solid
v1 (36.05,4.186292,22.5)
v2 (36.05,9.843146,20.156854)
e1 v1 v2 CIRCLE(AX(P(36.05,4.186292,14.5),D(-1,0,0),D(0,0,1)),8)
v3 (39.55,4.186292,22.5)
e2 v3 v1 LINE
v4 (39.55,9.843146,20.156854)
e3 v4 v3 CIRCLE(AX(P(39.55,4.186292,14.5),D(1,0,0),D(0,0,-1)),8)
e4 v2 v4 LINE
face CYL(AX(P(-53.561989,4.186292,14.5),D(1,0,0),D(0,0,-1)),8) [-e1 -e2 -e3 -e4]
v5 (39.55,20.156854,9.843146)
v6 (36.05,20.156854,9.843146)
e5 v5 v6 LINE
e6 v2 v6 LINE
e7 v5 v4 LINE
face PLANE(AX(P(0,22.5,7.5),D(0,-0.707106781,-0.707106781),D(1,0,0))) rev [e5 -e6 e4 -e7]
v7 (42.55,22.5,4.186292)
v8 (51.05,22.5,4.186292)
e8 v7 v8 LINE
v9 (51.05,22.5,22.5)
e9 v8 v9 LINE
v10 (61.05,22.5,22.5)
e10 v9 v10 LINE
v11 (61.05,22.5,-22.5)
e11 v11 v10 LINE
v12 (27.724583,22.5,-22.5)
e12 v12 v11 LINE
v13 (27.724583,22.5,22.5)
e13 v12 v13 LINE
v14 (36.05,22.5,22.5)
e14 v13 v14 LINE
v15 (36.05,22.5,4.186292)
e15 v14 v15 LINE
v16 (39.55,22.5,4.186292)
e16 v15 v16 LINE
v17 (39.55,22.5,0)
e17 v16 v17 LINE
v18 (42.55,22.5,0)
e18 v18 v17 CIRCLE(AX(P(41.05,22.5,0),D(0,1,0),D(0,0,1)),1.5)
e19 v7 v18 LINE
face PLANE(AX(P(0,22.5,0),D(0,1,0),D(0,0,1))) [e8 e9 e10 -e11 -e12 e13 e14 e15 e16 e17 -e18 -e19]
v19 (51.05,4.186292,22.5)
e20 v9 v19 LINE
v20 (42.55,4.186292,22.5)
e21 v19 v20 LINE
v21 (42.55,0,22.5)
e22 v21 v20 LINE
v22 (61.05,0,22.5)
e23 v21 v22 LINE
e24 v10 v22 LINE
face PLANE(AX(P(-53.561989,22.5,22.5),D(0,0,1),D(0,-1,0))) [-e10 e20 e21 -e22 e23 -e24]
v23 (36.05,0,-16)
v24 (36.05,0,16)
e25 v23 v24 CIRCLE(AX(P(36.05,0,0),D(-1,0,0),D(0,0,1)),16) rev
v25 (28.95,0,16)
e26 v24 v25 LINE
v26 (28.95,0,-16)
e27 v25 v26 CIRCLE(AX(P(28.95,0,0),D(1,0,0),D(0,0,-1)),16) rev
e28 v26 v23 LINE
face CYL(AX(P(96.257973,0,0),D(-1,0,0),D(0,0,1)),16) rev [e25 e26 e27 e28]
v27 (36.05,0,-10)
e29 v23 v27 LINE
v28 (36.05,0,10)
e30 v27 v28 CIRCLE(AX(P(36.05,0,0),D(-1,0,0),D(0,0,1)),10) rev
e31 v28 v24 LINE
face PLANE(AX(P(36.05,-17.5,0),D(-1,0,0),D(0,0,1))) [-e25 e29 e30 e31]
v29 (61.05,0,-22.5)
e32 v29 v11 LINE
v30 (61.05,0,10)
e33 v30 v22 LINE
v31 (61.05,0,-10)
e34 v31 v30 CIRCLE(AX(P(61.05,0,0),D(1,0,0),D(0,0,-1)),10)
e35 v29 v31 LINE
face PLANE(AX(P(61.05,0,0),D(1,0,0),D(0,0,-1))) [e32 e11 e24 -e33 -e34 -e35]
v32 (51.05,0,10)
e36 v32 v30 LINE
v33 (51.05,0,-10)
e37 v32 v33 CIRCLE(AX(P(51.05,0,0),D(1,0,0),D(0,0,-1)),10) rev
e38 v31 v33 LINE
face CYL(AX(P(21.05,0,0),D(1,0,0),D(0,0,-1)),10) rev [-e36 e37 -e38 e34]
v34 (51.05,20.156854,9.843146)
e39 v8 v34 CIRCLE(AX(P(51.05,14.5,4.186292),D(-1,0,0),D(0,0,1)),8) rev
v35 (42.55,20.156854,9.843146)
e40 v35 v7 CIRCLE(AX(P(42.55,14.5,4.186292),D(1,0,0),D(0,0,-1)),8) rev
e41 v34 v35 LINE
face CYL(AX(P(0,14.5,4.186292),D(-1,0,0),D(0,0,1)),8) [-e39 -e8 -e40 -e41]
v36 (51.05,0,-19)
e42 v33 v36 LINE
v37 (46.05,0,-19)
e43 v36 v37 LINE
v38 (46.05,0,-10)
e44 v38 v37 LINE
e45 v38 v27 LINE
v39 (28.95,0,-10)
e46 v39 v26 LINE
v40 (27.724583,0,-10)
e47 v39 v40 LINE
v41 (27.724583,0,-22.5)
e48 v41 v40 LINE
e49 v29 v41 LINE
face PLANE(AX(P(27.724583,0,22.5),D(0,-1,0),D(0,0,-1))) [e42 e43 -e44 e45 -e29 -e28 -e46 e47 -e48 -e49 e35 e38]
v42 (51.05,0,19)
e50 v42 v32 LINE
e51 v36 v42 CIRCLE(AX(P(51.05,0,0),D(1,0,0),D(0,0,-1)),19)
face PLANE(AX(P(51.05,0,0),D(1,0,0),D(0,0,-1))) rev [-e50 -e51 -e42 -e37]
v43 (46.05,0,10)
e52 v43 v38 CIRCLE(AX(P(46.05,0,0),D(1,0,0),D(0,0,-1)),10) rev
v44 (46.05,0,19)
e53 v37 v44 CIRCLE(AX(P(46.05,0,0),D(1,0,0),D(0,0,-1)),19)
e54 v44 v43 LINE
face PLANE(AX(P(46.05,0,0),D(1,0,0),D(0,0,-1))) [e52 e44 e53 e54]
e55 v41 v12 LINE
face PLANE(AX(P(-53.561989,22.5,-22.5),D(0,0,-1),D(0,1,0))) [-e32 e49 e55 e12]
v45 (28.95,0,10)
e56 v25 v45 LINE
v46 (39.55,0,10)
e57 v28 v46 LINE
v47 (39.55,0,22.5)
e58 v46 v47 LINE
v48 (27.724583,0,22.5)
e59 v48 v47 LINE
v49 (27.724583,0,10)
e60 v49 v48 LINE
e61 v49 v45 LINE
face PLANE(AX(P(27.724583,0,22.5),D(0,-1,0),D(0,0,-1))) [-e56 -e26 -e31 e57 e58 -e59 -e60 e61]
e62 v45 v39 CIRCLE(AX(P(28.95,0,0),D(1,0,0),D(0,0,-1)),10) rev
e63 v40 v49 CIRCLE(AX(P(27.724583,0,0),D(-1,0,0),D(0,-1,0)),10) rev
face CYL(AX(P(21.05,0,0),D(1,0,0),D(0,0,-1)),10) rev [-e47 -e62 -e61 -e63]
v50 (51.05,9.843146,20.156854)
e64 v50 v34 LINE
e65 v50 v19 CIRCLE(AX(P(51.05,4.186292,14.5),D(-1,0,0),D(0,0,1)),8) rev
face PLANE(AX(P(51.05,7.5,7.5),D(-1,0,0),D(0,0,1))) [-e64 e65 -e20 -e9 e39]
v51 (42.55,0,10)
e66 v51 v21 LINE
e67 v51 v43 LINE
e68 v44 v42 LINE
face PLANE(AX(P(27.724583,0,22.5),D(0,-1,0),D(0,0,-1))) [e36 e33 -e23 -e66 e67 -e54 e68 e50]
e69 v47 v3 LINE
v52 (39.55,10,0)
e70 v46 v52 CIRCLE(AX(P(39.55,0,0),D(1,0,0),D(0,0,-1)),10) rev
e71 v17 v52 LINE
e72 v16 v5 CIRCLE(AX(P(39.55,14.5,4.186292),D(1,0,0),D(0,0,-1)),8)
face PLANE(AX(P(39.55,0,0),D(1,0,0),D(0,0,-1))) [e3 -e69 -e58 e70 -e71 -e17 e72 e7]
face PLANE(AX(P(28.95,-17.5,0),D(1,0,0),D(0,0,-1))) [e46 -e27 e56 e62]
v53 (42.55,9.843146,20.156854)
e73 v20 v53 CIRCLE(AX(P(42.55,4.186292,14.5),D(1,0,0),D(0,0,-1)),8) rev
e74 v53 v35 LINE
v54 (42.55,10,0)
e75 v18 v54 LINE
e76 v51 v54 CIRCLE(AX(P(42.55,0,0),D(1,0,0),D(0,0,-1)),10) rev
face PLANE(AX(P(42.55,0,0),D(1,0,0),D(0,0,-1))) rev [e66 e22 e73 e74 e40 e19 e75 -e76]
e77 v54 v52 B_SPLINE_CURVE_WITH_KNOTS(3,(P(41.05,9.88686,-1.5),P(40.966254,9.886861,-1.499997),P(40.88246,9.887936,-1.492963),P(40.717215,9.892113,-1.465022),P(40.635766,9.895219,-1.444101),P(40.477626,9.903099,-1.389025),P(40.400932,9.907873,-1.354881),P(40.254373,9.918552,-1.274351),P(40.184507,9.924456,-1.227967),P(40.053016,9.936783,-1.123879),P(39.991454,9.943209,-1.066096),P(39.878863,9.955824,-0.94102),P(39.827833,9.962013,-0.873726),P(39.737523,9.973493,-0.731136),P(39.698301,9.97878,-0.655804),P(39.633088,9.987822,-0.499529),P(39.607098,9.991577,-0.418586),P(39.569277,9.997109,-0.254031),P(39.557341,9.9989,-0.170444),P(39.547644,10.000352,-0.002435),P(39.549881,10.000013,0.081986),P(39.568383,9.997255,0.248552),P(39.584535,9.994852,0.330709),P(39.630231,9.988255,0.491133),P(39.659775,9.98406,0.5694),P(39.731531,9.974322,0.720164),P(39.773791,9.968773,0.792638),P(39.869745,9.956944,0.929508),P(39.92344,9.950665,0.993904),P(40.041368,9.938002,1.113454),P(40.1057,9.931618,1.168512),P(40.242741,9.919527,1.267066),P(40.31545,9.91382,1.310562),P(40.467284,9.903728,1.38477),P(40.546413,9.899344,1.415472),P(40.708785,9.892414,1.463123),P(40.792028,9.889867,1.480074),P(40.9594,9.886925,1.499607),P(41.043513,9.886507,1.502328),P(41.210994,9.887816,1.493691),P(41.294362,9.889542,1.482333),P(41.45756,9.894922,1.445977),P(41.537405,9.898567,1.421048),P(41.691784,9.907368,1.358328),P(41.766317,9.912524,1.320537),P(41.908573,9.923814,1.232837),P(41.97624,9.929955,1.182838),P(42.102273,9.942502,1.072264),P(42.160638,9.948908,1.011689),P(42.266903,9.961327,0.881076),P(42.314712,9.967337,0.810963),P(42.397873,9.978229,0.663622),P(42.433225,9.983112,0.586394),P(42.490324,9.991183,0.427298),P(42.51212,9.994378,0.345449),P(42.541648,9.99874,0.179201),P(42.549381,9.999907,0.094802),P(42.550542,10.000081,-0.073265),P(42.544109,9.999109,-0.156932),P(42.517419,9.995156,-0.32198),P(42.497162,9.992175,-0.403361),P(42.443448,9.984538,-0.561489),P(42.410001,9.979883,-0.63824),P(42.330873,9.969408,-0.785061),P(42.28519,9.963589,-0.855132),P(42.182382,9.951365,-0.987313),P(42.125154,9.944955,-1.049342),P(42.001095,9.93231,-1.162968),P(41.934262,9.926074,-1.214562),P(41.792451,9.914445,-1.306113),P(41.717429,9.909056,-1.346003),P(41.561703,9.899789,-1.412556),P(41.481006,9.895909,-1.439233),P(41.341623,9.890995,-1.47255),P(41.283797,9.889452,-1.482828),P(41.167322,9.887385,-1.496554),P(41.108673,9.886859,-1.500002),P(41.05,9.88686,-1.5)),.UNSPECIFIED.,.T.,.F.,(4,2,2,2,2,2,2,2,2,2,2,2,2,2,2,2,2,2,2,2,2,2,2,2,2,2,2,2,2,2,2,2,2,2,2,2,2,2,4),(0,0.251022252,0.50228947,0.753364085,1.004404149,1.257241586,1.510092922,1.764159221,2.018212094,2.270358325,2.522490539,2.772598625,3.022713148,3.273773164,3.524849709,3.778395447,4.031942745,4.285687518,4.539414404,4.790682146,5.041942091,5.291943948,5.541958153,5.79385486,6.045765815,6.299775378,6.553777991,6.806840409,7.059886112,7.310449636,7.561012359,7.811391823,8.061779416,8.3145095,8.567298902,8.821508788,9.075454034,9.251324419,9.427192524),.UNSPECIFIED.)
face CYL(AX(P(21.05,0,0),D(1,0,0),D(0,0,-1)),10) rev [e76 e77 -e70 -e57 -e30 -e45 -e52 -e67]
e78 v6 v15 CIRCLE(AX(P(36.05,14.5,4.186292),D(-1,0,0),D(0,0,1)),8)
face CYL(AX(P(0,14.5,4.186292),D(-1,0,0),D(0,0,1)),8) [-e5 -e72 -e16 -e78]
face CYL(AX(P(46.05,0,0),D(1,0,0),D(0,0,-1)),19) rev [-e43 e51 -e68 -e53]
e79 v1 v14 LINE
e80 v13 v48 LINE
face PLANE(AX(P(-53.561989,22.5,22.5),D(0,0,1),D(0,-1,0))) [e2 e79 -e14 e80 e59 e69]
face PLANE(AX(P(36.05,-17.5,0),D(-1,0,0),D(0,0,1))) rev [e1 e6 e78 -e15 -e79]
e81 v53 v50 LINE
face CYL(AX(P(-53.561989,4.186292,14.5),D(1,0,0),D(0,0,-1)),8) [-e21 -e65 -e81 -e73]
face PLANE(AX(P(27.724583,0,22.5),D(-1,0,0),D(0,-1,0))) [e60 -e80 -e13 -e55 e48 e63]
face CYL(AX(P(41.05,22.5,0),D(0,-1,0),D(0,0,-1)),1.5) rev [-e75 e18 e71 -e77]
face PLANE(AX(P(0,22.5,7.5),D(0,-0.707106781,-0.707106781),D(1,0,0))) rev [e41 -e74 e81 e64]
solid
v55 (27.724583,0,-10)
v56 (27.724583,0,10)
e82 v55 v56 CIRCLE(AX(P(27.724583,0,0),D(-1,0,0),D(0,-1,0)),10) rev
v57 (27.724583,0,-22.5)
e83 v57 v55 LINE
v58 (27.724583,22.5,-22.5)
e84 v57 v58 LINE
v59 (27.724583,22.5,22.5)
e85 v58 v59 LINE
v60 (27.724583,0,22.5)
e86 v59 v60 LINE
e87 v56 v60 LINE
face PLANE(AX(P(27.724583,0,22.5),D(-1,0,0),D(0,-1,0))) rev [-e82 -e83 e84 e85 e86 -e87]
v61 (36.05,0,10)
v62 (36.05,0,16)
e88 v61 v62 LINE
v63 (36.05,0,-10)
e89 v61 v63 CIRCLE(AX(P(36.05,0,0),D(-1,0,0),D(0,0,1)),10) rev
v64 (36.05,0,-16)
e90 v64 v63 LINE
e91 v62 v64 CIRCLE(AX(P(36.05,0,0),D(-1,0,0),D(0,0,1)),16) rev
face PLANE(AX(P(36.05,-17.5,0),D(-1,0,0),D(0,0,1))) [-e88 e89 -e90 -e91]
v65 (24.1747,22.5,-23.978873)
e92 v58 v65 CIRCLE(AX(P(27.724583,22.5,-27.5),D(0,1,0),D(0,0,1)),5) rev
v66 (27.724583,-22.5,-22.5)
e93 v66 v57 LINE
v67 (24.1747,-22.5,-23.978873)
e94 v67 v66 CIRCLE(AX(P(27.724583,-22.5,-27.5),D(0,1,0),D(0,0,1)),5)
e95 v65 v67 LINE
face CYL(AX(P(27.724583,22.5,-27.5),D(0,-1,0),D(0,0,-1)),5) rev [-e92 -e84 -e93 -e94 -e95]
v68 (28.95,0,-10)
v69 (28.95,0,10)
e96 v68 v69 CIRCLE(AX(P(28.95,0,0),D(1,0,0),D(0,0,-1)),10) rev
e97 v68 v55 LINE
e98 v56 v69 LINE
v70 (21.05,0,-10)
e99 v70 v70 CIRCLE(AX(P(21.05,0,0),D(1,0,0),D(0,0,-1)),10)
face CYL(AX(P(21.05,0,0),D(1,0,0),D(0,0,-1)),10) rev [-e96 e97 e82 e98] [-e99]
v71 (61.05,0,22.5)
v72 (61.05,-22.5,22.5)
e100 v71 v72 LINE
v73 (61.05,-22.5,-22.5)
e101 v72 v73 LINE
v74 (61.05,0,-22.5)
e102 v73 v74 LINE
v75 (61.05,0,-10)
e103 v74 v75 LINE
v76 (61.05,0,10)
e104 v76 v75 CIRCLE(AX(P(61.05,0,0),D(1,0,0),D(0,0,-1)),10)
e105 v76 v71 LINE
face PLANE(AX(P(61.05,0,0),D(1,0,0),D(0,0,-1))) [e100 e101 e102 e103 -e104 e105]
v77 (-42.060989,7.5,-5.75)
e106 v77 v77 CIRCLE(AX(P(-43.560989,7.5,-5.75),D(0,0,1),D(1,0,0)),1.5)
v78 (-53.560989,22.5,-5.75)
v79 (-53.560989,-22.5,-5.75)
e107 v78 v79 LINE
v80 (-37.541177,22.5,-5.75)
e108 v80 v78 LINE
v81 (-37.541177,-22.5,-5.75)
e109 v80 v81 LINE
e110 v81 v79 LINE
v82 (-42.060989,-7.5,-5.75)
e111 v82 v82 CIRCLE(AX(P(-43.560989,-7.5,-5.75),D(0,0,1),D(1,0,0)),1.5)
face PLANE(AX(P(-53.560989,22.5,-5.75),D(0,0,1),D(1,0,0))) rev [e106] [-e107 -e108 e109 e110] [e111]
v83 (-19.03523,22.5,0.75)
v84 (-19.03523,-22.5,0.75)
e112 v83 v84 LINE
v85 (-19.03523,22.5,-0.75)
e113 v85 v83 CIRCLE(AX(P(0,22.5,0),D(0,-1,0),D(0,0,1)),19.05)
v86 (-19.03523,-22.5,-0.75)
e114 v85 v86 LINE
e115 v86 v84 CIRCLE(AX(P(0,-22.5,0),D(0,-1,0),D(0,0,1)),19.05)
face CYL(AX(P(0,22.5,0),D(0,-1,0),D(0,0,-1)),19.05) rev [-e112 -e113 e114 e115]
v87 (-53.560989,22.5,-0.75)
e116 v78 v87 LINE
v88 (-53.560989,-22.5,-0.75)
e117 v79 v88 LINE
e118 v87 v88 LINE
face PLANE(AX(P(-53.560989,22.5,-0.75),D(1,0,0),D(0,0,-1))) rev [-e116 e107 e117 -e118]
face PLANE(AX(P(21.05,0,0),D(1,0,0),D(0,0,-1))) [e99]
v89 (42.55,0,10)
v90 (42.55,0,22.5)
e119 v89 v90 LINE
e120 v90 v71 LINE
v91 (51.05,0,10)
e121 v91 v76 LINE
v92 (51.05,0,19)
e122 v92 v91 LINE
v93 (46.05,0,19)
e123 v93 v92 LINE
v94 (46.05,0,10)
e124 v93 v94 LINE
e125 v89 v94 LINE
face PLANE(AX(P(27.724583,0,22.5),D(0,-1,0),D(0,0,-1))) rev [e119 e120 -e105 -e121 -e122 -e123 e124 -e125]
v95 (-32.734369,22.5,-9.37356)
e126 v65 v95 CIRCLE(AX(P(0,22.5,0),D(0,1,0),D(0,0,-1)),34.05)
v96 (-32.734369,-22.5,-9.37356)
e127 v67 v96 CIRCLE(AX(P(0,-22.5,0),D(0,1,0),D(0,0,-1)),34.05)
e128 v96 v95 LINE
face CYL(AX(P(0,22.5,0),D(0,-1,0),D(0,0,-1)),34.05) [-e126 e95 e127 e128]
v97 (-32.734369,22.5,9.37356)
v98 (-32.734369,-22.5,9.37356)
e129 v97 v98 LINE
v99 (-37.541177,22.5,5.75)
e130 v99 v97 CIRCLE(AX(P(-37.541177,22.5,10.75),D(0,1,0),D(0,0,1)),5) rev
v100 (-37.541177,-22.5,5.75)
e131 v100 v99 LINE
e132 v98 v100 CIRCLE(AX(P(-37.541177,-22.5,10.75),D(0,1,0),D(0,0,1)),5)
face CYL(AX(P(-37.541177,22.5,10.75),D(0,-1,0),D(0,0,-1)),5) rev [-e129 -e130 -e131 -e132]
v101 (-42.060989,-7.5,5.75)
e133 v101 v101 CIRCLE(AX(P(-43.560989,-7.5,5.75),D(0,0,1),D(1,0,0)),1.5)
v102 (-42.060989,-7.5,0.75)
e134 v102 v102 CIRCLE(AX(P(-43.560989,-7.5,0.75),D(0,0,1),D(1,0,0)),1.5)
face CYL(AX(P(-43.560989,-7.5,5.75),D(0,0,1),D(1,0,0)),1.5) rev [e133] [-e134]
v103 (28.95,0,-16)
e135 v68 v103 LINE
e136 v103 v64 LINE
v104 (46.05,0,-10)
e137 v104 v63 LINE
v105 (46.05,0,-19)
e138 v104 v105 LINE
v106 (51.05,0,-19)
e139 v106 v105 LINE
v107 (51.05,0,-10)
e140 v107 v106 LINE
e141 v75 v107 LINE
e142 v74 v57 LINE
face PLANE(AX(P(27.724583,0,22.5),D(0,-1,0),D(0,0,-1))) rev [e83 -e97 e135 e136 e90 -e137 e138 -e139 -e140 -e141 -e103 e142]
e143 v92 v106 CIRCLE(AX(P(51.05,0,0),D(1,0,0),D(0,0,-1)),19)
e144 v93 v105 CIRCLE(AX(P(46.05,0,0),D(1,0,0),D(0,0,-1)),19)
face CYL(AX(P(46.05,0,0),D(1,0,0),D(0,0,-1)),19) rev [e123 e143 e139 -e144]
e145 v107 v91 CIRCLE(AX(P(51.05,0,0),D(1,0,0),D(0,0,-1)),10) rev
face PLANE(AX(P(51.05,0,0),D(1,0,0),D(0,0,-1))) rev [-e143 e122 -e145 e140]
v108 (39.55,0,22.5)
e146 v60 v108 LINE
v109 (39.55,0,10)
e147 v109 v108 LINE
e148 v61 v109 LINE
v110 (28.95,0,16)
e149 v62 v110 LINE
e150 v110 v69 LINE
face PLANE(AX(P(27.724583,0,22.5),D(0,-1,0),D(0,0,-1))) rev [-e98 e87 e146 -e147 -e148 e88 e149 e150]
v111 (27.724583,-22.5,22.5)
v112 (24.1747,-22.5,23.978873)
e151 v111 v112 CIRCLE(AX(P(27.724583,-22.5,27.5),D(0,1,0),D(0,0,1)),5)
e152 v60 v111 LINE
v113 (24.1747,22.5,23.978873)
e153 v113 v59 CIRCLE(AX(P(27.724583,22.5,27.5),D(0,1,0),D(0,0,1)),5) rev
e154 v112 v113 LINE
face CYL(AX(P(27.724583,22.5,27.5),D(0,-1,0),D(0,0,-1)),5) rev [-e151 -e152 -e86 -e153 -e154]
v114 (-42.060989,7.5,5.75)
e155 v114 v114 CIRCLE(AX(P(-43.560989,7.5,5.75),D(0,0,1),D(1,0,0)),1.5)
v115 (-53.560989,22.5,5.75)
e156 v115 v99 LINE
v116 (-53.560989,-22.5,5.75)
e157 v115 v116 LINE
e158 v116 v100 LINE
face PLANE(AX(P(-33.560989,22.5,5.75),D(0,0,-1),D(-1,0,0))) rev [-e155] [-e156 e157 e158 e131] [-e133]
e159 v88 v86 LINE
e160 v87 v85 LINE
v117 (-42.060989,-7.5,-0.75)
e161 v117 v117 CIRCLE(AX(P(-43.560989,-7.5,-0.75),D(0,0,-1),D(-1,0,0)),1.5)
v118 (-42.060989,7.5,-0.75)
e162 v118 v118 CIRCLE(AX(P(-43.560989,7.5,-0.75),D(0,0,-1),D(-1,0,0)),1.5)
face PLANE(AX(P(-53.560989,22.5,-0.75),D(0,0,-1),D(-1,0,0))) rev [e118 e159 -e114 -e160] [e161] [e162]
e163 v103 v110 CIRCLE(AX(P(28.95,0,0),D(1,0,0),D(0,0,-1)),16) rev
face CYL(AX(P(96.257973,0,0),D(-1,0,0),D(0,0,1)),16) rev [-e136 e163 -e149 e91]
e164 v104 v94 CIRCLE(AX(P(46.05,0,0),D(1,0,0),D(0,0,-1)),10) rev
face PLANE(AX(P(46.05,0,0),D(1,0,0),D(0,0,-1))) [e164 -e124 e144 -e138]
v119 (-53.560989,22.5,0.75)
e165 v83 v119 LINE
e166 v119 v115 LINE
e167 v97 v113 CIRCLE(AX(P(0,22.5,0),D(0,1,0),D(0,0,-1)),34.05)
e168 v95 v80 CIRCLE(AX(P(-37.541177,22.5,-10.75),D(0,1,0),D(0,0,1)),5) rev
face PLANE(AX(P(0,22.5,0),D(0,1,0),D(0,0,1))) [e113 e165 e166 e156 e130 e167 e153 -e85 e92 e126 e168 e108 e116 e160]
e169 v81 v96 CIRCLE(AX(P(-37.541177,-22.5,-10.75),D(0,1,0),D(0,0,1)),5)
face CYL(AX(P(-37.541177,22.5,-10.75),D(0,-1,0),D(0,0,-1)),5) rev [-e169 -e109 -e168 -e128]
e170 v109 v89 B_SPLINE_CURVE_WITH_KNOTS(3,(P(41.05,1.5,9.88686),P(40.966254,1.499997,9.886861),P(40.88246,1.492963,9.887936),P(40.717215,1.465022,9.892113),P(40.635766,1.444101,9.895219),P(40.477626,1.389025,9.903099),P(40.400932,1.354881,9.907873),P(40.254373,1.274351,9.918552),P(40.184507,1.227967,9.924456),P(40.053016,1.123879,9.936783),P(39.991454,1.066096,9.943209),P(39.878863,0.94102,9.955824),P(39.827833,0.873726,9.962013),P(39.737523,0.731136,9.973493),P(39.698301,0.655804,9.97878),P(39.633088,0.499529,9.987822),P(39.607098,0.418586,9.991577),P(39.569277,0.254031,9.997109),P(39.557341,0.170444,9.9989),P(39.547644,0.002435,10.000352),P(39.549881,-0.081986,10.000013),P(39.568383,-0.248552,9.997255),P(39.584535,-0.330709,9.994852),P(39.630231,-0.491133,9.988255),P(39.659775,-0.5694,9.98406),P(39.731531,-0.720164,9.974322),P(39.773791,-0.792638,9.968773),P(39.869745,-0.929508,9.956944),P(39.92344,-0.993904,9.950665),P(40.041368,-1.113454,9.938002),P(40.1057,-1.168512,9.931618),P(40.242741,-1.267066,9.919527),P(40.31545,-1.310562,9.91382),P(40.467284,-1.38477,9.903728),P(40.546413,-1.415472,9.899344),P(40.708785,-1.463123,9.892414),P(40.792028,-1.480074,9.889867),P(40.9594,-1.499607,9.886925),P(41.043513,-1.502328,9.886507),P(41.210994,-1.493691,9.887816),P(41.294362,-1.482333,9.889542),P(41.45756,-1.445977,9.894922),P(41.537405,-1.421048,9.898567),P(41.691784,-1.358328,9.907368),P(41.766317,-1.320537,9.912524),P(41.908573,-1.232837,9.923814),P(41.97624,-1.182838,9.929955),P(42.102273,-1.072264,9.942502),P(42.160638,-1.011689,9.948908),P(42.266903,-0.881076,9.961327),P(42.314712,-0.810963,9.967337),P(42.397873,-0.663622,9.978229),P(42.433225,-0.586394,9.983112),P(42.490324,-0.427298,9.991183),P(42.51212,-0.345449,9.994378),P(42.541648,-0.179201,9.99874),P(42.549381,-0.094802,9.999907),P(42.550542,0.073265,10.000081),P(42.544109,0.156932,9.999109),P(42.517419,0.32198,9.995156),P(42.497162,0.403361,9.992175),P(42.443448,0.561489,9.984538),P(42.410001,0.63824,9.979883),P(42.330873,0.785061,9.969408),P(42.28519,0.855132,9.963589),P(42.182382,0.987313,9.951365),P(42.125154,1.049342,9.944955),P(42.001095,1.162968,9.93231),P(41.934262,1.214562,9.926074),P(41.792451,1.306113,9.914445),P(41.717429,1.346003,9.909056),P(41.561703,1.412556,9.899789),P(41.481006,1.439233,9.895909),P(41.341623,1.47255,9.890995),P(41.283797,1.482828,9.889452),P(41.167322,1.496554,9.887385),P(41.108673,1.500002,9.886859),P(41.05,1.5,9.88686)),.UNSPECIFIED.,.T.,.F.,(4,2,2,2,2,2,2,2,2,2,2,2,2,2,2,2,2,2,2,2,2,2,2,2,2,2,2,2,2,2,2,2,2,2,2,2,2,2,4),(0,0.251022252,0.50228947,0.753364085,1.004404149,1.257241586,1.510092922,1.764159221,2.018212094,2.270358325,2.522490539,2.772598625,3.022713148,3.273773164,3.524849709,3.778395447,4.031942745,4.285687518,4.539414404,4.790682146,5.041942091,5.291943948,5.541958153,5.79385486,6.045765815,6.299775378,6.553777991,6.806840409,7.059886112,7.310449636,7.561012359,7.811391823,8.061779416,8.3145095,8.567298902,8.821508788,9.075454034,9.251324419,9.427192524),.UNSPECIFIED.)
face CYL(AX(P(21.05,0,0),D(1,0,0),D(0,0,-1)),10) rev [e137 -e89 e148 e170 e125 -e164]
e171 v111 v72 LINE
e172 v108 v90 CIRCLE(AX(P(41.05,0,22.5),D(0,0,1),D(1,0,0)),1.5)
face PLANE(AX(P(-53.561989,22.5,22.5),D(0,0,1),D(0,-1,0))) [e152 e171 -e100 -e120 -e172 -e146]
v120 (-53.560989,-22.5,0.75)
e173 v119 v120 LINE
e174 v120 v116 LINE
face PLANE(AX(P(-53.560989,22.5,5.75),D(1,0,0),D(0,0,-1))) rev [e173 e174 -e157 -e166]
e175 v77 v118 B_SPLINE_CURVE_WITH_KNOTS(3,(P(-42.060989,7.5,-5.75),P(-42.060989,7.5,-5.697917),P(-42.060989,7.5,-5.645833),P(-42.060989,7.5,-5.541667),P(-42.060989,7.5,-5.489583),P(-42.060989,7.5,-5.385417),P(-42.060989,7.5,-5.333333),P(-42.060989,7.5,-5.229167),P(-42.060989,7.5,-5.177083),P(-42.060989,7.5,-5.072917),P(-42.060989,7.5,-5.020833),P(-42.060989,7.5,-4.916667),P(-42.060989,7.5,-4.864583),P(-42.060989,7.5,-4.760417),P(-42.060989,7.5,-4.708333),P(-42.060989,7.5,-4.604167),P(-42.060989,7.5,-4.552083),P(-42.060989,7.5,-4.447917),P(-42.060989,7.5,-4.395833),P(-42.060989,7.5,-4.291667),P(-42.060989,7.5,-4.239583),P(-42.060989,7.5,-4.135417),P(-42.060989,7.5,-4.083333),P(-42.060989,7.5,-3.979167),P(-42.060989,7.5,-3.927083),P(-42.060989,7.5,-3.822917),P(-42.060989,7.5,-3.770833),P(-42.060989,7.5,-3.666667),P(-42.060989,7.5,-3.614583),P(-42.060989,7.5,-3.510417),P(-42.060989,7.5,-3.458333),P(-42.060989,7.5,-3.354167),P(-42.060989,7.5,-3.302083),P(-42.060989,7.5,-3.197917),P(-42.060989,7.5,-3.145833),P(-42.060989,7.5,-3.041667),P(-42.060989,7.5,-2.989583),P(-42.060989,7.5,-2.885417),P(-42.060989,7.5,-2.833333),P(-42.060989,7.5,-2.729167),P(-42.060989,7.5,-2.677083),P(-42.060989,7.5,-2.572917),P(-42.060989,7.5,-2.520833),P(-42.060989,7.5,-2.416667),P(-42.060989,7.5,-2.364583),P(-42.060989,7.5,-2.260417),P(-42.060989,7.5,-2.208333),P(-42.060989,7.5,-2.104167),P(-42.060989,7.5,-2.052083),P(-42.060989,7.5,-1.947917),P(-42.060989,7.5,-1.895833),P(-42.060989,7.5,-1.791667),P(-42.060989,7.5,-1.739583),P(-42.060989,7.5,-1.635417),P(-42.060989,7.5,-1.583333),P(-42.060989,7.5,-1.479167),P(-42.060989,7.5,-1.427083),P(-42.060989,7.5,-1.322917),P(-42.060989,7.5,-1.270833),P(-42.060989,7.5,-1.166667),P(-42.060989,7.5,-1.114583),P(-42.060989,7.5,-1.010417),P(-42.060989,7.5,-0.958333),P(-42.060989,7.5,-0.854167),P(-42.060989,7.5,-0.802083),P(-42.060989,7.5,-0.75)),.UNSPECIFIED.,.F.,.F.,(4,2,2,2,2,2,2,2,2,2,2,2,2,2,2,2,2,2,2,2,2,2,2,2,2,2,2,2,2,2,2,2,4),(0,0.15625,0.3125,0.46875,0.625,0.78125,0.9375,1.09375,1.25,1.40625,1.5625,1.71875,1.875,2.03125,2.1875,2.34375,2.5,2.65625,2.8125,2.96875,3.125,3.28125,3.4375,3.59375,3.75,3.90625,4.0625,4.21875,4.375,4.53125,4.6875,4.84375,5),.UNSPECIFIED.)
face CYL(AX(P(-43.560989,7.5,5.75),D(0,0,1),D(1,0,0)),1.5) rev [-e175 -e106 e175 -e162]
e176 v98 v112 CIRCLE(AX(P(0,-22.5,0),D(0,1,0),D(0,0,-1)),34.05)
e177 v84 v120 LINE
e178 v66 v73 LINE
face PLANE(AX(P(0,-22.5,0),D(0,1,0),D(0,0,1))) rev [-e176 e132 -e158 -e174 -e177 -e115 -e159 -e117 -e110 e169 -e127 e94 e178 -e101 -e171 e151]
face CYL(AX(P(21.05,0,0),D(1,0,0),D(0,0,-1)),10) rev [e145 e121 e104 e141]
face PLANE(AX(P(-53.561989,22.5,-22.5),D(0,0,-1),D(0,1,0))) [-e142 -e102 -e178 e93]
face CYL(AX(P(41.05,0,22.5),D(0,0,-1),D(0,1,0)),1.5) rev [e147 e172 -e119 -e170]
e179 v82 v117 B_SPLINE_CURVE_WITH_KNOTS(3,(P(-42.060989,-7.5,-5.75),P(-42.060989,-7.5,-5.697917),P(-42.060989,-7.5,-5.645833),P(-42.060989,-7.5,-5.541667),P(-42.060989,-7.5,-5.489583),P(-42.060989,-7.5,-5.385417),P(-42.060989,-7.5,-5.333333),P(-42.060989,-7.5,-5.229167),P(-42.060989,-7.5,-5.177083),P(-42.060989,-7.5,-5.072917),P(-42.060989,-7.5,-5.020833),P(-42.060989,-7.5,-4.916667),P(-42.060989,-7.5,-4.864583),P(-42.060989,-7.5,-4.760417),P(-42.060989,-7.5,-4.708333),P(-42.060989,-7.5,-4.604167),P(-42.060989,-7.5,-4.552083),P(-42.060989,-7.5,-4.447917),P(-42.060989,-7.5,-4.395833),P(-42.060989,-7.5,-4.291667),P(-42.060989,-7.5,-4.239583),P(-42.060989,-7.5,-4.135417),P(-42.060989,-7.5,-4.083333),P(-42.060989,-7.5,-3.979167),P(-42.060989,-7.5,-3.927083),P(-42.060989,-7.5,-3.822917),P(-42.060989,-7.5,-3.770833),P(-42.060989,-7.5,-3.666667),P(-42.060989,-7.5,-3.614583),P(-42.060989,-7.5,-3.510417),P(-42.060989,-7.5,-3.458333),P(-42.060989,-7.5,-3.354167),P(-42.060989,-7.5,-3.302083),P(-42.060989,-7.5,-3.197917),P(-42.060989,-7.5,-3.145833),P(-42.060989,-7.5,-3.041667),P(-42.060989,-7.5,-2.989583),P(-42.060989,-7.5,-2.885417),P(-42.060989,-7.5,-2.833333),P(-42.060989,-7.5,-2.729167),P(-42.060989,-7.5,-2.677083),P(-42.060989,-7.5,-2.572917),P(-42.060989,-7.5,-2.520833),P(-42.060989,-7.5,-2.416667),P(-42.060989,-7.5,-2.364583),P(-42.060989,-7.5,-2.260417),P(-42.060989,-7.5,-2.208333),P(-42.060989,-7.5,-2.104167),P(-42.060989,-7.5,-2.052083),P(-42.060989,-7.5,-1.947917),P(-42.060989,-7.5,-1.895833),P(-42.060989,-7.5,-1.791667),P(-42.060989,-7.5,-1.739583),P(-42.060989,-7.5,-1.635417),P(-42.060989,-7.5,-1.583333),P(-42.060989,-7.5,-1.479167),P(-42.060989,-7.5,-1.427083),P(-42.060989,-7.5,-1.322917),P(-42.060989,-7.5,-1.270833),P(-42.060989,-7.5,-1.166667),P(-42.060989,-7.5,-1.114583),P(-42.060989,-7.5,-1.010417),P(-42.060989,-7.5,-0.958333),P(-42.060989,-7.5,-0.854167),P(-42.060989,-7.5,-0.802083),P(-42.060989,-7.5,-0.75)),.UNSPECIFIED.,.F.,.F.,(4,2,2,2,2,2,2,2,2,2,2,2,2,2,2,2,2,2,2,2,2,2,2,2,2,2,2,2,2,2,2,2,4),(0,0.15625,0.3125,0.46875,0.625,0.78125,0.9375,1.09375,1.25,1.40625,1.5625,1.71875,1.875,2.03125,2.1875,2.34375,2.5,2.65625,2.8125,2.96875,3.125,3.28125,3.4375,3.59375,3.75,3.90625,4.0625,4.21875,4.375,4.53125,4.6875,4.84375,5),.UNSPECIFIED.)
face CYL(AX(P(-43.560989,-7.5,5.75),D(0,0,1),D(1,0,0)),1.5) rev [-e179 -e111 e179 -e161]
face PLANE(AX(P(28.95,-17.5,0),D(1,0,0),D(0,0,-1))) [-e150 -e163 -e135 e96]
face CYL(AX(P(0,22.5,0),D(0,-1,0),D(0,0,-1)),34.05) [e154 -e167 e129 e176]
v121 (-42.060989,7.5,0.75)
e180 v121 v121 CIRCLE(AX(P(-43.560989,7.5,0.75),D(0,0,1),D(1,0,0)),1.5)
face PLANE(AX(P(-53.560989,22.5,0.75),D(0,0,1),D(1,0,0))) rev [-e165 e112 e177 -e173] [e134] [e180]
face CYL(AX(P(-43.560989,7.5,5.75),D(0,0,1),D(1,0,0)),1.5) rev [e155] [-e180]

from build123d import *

# Parameters (mm, degrees)
BOSS_EXTRUDE1_DEPTH     = 22.5
F_3_0MM_DOWEL_HOLE1_D   = 3
BOSS_EXTRUDE2_START     = -8.493151603
BOSS_EXTRUDE2_OUTLINE_W = 45
BOSS_EXTRUDE2_OUTLINE_H = 45
BOSS_EXTRUDE2_DEPTH     = 35.493151603
SKETCH5_R               = 10
CUT_EXTRUDE1_DEPTH      = 40
CUT_EXTRUDE9_START      = -10
SKETCH16_R              = 19
CUT_EXTRUDE9_DEPTH      = 5
CUT_EXTRUDE2_START      = 22.5
SKETCH7_W               = 7.1
SKETCH7_H               = 45
CUT_EXTRUDE2_DEPTH      = 40
SKETCH8_W               = 22.5
SKETCH8_H               = 22.5
CUT_EXTRUDE3_DEPTH      = 1.5
CUT_EXTRUDE5_OUTLINE_W  = 1.5
CUT_EXTRUDE5_OUTLINE_H  = 12.613186919
CUT_EXTRUDE8_START      = 9
CUT_EXTRUDE8_DEPTH      = 14
CHAMFER1_START          = 36.05
CHAMFER1_DEPTH          = 15
FILLET3_R               = 5
FILLET4_R               = 8
SKETCH23_W              = 45
SKETCH23_H              = 40
SKETCH23_R              = 16
BOSS_EXTRUDE5_DEPTH     = 7.1
SPLIT1_START            = 27.724582954
SPLIT1_DEPTH            = 33.325417046
SPLIT1_START_2          = 51.05
SPLIT1_2_DEPTH          = 10
SPLIT1_START_3          = 36.05
SPLIT1_3_DEPTH          = 10
SPLIT1_4_DEPTH          = 8.325417046
SPLIT1_5_DEPTH          = 1.225417046
SPLIT1_START_4          = -1
SPLIT1_6_DEPTH          = 24
SPLIT1_7_DEPTH          = 22.5


with BuildPart() as part:
    # Sketch3 → Boss-Extrude1 (new, symmetric)
    with BuildSketch(Plane(origin=(0, 0, 0), x_dir=(1, 0, 0), z_dir=(0, 1, 0))):
        with BuildLine():
            Line((-53.560989258, 0.75), (-53.560989258, 5.75))
            Line((-53.560989258, 5.75), (-33.560989258, 5.75))
            ThreePointArc((-33.560989258, 5.75), (34.05, 0), (-33.560989258, -5.75))
            Line((-33.560989258, -5.75), (-53.560989258, -5.75))
            Line((-53.560989258, -5.75), (-53.560989258, -0.75))
            Line((-53.560989258, -0.75), (-19.035230495, -0.75))
            ThreePointArc((-19.035230495, -0.75), (19.05, 0), (-19.035230495, 0.75))
            Line((-19.035230495, 0.75), (-53.560989258, 0.75))
        make_face()
    extrude(amount=BOSS_EXTRUDE1_DEPTH, both=True)

    # Ø3.0mm Dowel Hole1 (through all)
    with Locations(Plane.XY.offset(5.75)):
        with Locations((-43.560989258, 7.5), (-43.560989258, -7.5)):
            Hole(F_3_0MM_DOWEL_HOLE1_D / 2)

    # Boss-Extrude2: read off the stored shape, not the designer's step
    # Boss-Extrude2 outline → Boss-Extrude2 (add)
    with BuildSketch(Plane(origin=(34.05, 0, 0), x_dir=(0, 0, -1), z_dir=(1, 0, 0)).offset(BOSS_EXTRUDE2_START)):
        Rectangle(BOSS_EXTRUDE2_OUTLINE_W, BOSS_EXTRUDE2_OUTLINE_H)
    extrude(amount=BOSS_EXTRUDE2_DEPTH)

    # Sketch5 → Cut-Extrude1 (cut)
    with BuildSketch(Plane(origin=(61.05, 0, 0), x_dir=(0, 0, -1), z_dir=(1, 0, 0))):
        Circle(SKETCH5_R)
    extrude(amount=-CUT_EXTRUDE1_DEPTH, mode=Mode.SUBTRACT)

    # Sketch16 → Cut-Extrude9 (cut)
    with BuildSketch(Plane(origin=(61.05, 0, 0), x_dir=(0, 0, -1), z_dir=(1, 0, 0)).offset(CUT_EXTRUDE9_START)):
        Circle(SKETCH16_R)
    extrude(amount=-CUT_EXTRUDE9_DEPTH, mode=Mode.SUBTRACT)

    # Sketch7 → Cut-Extrude2 (cut)
    with BuildSketch(Plane(origin=(0, 0, 0), x_dir=(1, 0, 0), z_dir=(0, 1, 0)).offset(CUT_EXTRUDE2_START)):
        with Locations((32.5, 0)):
            Rectangle(SKETCH7_W, SKETCH7_H)
    extrude(amount=-CUT_EXTRUDE2_DEPTH, mode=Mode.SUBTRACT)

    # Sketch8 → Cut-Extrude3 (cut, symmetric)
    with BuildSketch(Plane.ZY.offset(-41.05)):
        with Locations((11.25, 11.25)):
            Rectangle(SKETCH8_W, SKETCH8_H)
    extrude(amount=CUT_EXTRUDE3_DEPTH, both=True, mode=Mode.SUBTRACT)

    # Cut-Extrude5: read off the stored shape, not the designer's step
    # Cut-Extrude5 outline → Cut-Extrude5 (revolve, cut)
    with BuildSketch(Plane(origin=(41.05, 0, 0), x_dir=(1, 0, 0), z_dir=(0, -1, 0))):
        with Locations((0.75, 16.19340654)):
            Rectangle(CUT_EXTRUDE5_OUTLINE_W, CUT_EXTRUDE5_OUTLINE_H)
    revolve(axis=Axis((41.05, 0, 0), (0, 0, 1)), mode=Mode.SUBTRACT)

    # Cut-Extrude8: read off the stored shape, not the designer's step
    # Cut-Extrude8 outline → Cut-Extrude8 (cut)
    with BuildSketch(Plane(origin=(0, 0, 0), x_dir=(1, 0, 0), z_dir=(0, 1, 0)).offset(CUT_EXTRUDE8_START)):
        with BuildLine():
            ThreePointArc((42.55, 0), (41.05, 1.5), (39.55, 0))
            Line((39.55, 0), (42.55, 0))
        make_face()
    extrude(amount=CUT_EXTRUDE8_DEPTH, mode=Mode.SUBTRACT)

    # Chamfer1: read off the stored shape, not the designer's step
    # Chamfer1 outline → Chamfer1 (cut)
    with BuildSketch(Plane.YZ.offset(CHAMFER1_START)):
        Polygon((22.5, 22.5), (7.5, 22.5), (22.5, 7.5), align=None)
    extrude(amount=CHAMFER1_DEPTH, mode=Mode.SUBTRACT)

    # Fillet3
    fillet3_edges = [part.edges().sort_by_distance(p)[0] for p in [
        (-33.560989258, 0, -5.75),
        (-33.560989258, 0, 5.75),
        (25.556848397, 0, -22.5),
        (25.556848397, 0, 22.5),
    ]]
    fillet(fillet3_edges, radius=FILLET3_R)

    # Fillet4
    fillet4_edges = [part.edges().sort_by_distance(p)[0] for p in [
        (37.8, 22.5, 7.5),
        (46.8, 22.5, 7.5),
        (37.8, 7.5, 22.5),
        (46.8, 7.5, 22.5),
    ]]
    fillet(fillet4_edges, radius=FILLET4_R)

    # Sketch23 → Boss-Extrude5 (add)
    with BuildSketch(Plane(origin=(28.95, 0, 0), x_dir=(0, 0, -1), z_dir=(1, 0, 0))):
        with Locations((0, 2.5)):
            Rectangle(SKETCH23_W, SKETCH23_H)
        with Locations(Location((0, 0, 0), (0, 0, 180))):
            Circle(SKETCH23_R, mode=Mode.SUBTRACT)
    extrude(amount=BOSS_EXTRUDE5_DEPTH)

    # Split1 7 outline → Split1 7 (cut)
    with BuildSketch(Plane(origin=(0, 0, 0), x_dir=(1, 0, 0), z_dir=(0, 1, 0))):
        with BuildLine():
            Line((61.05, 22.5), (27.724582954, 22.5))
            Line((27.724582954, 22.5), (27.724582954, -22.5))
            Line((27.724582954, -22.5), (36.05, -22.5))
            Line((36.05, -22.5), (39.55, -22.5))
            Line((39.55, -22.5), (39.55, 0))
            ThreePointArc((39.55, 0), (41.05, 1.5), (42.55, 0))
            Line((42.55, 0), (42.55, -22.5))
            Line((42.55, -22.5), (51.05, -22.5))
            Line((51.05, -22.5), (61.05, -22.5))
            Line((61.05, -22.5), (61.05, 22.5))
        make_face()
    extrude(amount=SPLIT1_7_DEPTH, mode=Mode.SUBTRACT)


with BuildPart() as body_2:
    # Split1: read off the stored shape, not the designer's step
    # Split1 outline → Split1 (new body)
    with BuildSketch(Plane.YZ.offset(SPLIT1_START)):
        with BuildLine():
            Line((4.186291501, 22.5), (0, 22.5))
            Line((0, 22.5), (0, 19))
            ThreePointArc((0, 19), (19, 0), (0, -19))
            Line((0, -19), (0, -22.5))
            Line((0, -22.5), (22.5, -22.5))
            Line((22.5, -22.5), (22.5, 4.186291501))
            ThreePointArc((22.5, 4.186291501), (21.89103626, 7.24775896), (20.156854249, 9.843145751))
            Line((20.156854249, 9.843145751), (9.843145751, 20.156854249))
            ThreePointArc((9.843145751, 20.156854249), (7.24775896, 21.89103626), (4.186291501, 22.5))
        make_face()
    extrude(amount=SPLIT1_DEPTH)

    # Split1 2 outline → Split1 2 (add)
    with BuildSketch(Plane.YZ.offset(SPLIT1_START_2)):
        with BuildLine():
            ThreePointArc((0, -19), (19, 0), (0, 19))
            Line((0, 19), (0, 10))
            ThreePointArc((0, 10), (10, 0), (0, -10))
            Line((0, -10), (0, -19))
        make_face()
        with BuildLine():
            Line((22.5, 22.5), (4.186291501, 22.5))
            ThreePointArc((4.186291501, 22.5), (7.24775896, 21.89103626), (9.843145751, 20.156854249))
            Line((9.843145751, 20.156854249), (20.156854249, 9.843145751))
            ThreePointArc((20.156854249, 9.843145751), (21.89103626, 7.24775896), (22.5, 4.186291501))
            Line((22.5, 4.186291501), (22.5, 22.5))
        make_face()
    extrude(amount=SPLIT1_2_DEPTH)

    # Split1 3 outline → Split1 3 (add)
    with BuildSketch(Plane.YZ.offset(SPLIT1_START_3)):
        with BuildLine():
            ThreePointArc((0, -19), (19, 0), (0, 19))
            Line((0, 19), (0, 10))
            ThreePointArc((0, 10), (10, 0), (0, -10))
            Line((0, -10), (0, -19))
        make_face()
    extrude(amount=SPLIT1_3_DEPTH)

    # Split1 4 outline → Split1 4 (add)
    with BuildSketch(Plane.YZ.offset(SPLIT1_START)):
        with BuildLine():
            ThreePointArc((0, -19), (19, 0), (0, 19))
            Line((0, 19), (0, 16))
            ThreePointArc((0, 16), (16, 0), (0, -16))
            Line((0, -16), (0, -19))
        make_face()
        with BuildLine():
            Line((22.5, 22.5), (4.186291501, 22.5))
            ThreePointArc((4.186291501, 22.5), (7.24775896, 21.89103626), (9.843145751, 20.156854249))
            Line((9.843145751, 20.156854249), (20.156854249, 9.843145751))
            ThreePointArc((20.156854249, 9.843145751), (21.89103626, 7.24775896), (22.5, 4.186291501))
            Line((22.5, 4.186291501), (22.5, 22.5))
        make_face()
    extrude(amount=SPLIT1_4_DEPTH)

    # Split1 5 outline → Split1 5 (add)
    with BuildSketch(Plane.YZ.offset(SPLIT1_START)):
        with BuildLine():
            ThreePointArc((0, -16), (16, 0), (0, 16))
            Line((0, 16), (0, 10))
            ThreePointArc((0, 10), (10, 0), (0, -10))
            Line((0, -10), (0, -16))
        make_face()
    extrude(amount=SPLIT1_5_DEPTH)

    # Split1 6 outline → Split1 6 (cut)
    with BuildSketch(Plane(origin=(0, 0, 0), x_dir=(1, 0, 0), z_dir=(0, 1, 0)).offset(SPLIT1_START_4)):
        with BuildLine():
            Line((39.55, 0), (39.55, -22.5))
            Line((39.55, -22.5), (42.55, -22.5))
            Line((42.55, -22.5), (42.55, 0))
            ThreePointArc((42.55, 0), (41.05, 1.5), (39.55, 0))
        make_face()
    extrude(amount=SPLIT1_6_DEPTH, mode=Mode.SUBTRACT)


solid = Compound([part.part, body_2.part])
